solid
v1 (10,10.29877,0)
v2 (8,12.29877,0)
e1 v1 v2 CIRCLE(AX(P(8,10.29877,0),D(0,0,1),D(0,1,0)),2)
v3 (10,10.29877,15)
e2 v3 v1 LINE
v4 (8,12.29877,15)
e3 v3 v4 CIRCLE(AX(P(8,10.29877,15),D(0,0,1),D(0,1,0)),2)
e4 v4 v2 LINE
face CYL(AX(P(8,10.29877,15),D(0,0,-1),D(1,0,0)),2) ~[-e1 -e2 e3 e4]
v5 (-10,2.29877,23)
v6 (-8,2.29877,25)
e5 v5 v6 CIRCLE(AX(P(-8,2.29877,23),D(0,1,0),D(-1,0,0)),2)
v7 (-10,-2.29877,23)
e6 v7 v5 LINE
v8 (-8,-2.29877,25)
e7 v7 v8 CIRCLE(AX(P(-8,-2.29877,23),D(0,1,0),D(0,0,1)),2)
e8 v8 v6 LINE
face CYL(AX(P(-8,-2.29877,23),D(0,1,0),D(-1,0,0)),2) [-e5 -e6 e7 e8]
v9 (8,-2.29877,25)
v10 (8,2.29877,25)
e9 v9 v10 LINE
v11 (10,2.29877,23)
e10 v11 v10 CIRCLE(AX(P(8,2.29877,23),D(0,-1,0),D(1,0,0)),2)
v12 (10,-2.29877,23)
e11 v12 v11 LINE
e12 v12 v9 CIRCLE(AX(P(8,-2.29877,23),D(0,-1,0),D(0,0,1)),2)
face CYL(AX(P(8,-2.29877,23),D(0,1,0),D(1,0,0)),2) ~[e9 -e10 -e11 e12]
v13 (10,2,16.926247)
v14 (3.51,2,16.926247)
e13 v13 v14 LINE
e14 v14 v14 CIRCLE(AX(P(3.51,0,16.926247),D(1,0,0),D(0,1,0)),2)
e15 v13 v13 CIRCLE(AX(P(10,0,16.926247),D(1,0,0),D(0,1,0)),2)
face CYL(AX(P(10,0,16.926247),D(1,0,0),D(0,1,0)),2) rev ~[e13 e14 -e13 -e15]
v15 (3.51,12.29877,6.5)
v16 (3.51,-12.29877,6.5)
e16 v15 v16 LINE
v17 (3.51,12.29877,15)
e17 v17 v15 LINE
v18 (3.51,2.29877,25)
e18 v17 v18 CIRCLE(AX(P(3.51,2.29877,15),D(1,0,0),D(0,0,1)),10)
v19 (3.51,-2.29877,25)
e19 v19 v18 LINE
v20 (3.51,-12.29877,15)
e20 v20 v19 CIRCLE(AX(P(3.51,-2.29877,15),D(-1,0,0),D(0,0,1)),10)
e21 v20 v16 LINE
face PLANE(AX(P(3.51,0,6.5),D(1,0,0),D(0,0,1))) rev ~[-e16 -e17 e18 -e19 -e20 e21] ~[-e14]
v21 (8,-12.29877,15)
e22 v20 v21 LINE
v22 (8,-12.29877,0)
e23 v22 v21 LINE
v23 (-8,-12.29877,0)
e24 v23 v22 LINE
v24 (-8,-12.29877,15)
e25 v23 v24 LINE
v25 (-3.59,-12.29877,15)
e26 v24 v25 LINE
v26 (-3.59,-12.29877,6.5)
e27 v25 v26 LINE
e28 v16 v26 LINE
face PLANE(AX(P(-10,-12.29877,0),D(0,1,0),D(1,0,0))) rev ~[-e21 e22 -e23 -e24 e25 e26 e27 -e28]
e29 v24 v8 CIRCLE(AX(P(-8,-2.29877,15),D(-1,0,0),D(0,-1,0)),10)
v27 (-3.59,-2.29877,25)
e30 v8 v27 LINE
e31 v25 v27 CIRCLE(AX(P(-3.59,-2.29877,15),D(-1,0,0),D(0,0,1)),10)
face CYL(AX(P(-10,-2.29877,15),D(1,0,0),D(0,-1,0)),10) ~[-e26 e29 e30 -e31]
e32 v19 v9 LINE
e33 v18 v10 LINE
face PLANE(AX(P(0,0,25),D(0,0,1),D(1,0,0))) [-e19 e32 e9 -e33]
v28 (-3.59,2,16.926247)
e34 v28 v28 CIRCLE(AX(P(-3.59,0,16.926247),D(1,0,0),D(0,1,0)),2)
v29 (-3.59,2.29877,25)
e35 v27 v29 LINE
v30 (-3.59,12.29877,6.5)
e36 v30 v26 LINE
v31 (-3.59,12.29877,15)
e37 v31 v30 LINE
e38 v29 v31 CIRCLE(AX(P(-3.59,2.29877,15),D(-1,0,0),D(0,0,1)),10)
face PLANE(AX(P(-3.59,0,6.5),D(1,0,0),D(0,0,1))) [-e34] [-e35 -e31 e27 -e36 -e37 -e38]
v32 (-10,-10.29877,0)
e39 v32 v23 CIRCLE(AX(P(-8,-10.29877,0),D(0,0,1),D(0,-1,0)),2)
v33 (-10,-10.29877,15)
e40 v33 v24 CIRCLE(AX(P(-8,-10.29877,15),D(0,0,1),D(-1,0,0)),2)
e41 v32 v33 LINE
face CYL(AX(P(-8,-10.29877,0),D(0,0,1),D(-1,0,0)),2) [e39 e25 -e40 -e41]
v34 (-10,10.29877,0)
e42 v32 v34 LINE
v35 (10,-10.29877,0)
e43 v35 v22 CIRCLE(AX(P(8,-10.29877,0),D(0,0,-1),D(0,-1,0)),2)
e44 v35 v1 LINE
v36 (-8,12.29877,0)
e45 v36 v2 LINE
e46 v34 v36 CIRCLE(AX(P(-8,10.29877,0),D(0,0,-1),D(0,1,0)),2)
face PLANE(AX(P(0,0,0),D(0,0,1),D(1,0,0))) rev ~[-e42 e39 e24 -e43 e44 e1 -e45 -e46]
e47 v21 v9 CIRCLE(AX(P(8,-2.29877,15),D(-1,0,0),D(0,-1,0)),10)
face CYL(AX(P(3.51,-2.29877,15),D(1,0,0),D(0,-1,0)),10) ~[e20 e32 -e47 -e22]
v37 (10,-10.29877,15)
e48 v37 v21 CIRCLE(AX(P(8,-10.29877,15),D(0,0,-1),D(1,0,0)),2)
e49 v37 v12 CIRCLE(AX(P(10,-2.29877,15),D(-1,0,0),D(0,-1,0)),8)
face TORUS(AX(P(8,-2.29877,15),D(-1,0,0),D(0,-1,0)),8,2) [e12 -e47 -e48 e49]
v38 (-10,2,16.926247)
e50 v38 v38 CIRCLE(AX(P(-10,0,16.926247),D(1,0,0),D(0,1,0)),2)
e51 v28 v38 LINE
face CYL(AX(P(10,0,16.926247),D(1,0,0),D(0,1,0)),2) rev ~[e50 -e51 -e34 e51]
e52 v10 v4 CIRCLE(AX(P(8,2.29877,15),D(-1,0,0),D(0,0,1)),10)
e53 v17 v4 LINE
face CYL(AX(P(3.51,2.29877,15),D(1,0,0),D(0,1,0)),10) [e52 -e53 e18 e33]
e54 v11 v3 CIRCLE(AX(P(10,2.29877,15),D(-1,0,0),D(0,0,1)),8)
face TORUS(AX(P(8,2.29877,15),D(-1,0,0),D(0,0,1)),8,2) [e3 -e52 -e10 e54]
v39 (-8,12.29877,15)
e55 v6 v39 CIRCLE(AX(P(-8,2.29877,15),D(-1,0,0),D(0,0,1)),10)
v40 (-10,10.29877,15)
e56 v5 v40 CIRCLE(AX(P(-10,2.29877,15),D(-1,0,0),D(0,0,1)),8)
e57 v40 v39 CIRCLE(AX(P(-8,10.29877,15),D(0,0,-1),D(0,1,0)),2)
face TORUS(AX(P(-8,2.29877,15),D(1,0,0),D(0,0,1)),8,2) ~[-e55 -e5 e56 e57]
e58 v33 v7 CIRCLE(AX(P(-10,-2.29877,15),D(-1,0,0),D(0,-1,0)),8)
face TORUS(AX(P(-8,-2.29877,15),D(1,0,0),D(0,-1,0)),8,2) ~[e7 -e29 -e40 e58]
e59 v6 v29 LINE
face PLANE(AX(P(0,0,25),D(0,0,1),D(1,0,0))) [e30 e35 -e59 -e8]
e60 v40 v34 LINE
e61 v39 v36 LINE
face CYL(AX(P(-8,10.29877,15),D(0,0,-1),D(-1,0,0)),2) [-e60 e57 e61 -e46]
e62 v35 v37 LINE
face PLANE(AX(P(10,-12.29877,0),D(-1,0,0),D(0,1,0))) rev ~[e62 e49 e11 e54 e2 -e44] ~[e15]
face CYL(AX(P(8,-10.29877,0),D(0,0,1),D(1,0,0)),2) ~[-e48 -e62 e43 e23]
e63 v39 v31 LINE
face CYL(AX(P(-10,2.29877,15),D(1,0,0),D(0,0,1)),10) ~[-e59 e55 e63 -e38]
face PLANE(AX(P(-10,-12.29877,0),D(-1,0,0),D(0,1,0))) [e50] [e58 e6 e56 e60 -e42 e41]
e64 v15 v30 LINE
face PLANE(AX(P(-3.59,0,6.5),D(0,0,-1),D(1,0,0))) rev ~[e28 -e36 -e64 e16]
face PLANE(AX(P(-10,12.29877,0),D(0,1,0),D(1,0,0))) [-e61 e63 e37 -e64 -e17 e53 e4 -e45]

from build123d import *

# Parameters (mm, degrees)
F0_W     = 20
F0_H     = 24.5975396182
F1_DEPTH = 25
F2_W     = 7.1
F2_H     = 19.9254054902
F3_DEPTH = 12.5
F4_R     = 2
F5_DEPTH = 20.001
F6_R     = 10
F7_R     = 2
F8_R     = 2


with BuildPart() as f1:
    # F0 (on Top) → F1 (new body)
    with BuildSketch(Plane.XY):
        Rectangle(F0_W, F0_H)
    extrude(amount=F1_DEPTH)

    # F2 (on Front) → F3 (cut, symmetric)
    with BuildSketch(Plane.XZ):
        with Locations((-0.04, 16.4627027451)):
            Rectangle(F2_W, F2_H)
    extrude(amount=F3_DEPTH, both=True, mode=Mode.SUBTRACT)

    # F4 (on face) → F5 (cut, through all)
    with BuildSketch(Plane.YZ.offset(10)):
        with Locations((0, 16.9262466765)):
            Circle(F4_R)
    extrude(amount=-F5_DEPTH, mode=Mode.SUBTRACT)

    # F6
    f6_edges = [f1.edges().sort_by_distance(p)[0] for p in [
        (-6.795, -12.29877, 25),
        (6.755, -12.29877, 25),
        (6.755, 12.29877, 25),
        (-6.795, 12.29877, 25),
    ]]
    fillet(f6_edges, radius=F6_R)

    # F7
    f7_edges = [f1.edges().sort_by_distance(p)[0] for p in [
        (10, -9.369838, 22.071068),
        (10, 0, 25),
    ]]
    fillet(f7_edges, radius=F7_R)

    # F8
    f8_edges = [f1.edges().sort_by_distance(p)[0] for p in [
        (-10, 9.369838, 22.071068),
    ]]
    fillet(f8_edges, radius=F8_R)


solid = f1.part
